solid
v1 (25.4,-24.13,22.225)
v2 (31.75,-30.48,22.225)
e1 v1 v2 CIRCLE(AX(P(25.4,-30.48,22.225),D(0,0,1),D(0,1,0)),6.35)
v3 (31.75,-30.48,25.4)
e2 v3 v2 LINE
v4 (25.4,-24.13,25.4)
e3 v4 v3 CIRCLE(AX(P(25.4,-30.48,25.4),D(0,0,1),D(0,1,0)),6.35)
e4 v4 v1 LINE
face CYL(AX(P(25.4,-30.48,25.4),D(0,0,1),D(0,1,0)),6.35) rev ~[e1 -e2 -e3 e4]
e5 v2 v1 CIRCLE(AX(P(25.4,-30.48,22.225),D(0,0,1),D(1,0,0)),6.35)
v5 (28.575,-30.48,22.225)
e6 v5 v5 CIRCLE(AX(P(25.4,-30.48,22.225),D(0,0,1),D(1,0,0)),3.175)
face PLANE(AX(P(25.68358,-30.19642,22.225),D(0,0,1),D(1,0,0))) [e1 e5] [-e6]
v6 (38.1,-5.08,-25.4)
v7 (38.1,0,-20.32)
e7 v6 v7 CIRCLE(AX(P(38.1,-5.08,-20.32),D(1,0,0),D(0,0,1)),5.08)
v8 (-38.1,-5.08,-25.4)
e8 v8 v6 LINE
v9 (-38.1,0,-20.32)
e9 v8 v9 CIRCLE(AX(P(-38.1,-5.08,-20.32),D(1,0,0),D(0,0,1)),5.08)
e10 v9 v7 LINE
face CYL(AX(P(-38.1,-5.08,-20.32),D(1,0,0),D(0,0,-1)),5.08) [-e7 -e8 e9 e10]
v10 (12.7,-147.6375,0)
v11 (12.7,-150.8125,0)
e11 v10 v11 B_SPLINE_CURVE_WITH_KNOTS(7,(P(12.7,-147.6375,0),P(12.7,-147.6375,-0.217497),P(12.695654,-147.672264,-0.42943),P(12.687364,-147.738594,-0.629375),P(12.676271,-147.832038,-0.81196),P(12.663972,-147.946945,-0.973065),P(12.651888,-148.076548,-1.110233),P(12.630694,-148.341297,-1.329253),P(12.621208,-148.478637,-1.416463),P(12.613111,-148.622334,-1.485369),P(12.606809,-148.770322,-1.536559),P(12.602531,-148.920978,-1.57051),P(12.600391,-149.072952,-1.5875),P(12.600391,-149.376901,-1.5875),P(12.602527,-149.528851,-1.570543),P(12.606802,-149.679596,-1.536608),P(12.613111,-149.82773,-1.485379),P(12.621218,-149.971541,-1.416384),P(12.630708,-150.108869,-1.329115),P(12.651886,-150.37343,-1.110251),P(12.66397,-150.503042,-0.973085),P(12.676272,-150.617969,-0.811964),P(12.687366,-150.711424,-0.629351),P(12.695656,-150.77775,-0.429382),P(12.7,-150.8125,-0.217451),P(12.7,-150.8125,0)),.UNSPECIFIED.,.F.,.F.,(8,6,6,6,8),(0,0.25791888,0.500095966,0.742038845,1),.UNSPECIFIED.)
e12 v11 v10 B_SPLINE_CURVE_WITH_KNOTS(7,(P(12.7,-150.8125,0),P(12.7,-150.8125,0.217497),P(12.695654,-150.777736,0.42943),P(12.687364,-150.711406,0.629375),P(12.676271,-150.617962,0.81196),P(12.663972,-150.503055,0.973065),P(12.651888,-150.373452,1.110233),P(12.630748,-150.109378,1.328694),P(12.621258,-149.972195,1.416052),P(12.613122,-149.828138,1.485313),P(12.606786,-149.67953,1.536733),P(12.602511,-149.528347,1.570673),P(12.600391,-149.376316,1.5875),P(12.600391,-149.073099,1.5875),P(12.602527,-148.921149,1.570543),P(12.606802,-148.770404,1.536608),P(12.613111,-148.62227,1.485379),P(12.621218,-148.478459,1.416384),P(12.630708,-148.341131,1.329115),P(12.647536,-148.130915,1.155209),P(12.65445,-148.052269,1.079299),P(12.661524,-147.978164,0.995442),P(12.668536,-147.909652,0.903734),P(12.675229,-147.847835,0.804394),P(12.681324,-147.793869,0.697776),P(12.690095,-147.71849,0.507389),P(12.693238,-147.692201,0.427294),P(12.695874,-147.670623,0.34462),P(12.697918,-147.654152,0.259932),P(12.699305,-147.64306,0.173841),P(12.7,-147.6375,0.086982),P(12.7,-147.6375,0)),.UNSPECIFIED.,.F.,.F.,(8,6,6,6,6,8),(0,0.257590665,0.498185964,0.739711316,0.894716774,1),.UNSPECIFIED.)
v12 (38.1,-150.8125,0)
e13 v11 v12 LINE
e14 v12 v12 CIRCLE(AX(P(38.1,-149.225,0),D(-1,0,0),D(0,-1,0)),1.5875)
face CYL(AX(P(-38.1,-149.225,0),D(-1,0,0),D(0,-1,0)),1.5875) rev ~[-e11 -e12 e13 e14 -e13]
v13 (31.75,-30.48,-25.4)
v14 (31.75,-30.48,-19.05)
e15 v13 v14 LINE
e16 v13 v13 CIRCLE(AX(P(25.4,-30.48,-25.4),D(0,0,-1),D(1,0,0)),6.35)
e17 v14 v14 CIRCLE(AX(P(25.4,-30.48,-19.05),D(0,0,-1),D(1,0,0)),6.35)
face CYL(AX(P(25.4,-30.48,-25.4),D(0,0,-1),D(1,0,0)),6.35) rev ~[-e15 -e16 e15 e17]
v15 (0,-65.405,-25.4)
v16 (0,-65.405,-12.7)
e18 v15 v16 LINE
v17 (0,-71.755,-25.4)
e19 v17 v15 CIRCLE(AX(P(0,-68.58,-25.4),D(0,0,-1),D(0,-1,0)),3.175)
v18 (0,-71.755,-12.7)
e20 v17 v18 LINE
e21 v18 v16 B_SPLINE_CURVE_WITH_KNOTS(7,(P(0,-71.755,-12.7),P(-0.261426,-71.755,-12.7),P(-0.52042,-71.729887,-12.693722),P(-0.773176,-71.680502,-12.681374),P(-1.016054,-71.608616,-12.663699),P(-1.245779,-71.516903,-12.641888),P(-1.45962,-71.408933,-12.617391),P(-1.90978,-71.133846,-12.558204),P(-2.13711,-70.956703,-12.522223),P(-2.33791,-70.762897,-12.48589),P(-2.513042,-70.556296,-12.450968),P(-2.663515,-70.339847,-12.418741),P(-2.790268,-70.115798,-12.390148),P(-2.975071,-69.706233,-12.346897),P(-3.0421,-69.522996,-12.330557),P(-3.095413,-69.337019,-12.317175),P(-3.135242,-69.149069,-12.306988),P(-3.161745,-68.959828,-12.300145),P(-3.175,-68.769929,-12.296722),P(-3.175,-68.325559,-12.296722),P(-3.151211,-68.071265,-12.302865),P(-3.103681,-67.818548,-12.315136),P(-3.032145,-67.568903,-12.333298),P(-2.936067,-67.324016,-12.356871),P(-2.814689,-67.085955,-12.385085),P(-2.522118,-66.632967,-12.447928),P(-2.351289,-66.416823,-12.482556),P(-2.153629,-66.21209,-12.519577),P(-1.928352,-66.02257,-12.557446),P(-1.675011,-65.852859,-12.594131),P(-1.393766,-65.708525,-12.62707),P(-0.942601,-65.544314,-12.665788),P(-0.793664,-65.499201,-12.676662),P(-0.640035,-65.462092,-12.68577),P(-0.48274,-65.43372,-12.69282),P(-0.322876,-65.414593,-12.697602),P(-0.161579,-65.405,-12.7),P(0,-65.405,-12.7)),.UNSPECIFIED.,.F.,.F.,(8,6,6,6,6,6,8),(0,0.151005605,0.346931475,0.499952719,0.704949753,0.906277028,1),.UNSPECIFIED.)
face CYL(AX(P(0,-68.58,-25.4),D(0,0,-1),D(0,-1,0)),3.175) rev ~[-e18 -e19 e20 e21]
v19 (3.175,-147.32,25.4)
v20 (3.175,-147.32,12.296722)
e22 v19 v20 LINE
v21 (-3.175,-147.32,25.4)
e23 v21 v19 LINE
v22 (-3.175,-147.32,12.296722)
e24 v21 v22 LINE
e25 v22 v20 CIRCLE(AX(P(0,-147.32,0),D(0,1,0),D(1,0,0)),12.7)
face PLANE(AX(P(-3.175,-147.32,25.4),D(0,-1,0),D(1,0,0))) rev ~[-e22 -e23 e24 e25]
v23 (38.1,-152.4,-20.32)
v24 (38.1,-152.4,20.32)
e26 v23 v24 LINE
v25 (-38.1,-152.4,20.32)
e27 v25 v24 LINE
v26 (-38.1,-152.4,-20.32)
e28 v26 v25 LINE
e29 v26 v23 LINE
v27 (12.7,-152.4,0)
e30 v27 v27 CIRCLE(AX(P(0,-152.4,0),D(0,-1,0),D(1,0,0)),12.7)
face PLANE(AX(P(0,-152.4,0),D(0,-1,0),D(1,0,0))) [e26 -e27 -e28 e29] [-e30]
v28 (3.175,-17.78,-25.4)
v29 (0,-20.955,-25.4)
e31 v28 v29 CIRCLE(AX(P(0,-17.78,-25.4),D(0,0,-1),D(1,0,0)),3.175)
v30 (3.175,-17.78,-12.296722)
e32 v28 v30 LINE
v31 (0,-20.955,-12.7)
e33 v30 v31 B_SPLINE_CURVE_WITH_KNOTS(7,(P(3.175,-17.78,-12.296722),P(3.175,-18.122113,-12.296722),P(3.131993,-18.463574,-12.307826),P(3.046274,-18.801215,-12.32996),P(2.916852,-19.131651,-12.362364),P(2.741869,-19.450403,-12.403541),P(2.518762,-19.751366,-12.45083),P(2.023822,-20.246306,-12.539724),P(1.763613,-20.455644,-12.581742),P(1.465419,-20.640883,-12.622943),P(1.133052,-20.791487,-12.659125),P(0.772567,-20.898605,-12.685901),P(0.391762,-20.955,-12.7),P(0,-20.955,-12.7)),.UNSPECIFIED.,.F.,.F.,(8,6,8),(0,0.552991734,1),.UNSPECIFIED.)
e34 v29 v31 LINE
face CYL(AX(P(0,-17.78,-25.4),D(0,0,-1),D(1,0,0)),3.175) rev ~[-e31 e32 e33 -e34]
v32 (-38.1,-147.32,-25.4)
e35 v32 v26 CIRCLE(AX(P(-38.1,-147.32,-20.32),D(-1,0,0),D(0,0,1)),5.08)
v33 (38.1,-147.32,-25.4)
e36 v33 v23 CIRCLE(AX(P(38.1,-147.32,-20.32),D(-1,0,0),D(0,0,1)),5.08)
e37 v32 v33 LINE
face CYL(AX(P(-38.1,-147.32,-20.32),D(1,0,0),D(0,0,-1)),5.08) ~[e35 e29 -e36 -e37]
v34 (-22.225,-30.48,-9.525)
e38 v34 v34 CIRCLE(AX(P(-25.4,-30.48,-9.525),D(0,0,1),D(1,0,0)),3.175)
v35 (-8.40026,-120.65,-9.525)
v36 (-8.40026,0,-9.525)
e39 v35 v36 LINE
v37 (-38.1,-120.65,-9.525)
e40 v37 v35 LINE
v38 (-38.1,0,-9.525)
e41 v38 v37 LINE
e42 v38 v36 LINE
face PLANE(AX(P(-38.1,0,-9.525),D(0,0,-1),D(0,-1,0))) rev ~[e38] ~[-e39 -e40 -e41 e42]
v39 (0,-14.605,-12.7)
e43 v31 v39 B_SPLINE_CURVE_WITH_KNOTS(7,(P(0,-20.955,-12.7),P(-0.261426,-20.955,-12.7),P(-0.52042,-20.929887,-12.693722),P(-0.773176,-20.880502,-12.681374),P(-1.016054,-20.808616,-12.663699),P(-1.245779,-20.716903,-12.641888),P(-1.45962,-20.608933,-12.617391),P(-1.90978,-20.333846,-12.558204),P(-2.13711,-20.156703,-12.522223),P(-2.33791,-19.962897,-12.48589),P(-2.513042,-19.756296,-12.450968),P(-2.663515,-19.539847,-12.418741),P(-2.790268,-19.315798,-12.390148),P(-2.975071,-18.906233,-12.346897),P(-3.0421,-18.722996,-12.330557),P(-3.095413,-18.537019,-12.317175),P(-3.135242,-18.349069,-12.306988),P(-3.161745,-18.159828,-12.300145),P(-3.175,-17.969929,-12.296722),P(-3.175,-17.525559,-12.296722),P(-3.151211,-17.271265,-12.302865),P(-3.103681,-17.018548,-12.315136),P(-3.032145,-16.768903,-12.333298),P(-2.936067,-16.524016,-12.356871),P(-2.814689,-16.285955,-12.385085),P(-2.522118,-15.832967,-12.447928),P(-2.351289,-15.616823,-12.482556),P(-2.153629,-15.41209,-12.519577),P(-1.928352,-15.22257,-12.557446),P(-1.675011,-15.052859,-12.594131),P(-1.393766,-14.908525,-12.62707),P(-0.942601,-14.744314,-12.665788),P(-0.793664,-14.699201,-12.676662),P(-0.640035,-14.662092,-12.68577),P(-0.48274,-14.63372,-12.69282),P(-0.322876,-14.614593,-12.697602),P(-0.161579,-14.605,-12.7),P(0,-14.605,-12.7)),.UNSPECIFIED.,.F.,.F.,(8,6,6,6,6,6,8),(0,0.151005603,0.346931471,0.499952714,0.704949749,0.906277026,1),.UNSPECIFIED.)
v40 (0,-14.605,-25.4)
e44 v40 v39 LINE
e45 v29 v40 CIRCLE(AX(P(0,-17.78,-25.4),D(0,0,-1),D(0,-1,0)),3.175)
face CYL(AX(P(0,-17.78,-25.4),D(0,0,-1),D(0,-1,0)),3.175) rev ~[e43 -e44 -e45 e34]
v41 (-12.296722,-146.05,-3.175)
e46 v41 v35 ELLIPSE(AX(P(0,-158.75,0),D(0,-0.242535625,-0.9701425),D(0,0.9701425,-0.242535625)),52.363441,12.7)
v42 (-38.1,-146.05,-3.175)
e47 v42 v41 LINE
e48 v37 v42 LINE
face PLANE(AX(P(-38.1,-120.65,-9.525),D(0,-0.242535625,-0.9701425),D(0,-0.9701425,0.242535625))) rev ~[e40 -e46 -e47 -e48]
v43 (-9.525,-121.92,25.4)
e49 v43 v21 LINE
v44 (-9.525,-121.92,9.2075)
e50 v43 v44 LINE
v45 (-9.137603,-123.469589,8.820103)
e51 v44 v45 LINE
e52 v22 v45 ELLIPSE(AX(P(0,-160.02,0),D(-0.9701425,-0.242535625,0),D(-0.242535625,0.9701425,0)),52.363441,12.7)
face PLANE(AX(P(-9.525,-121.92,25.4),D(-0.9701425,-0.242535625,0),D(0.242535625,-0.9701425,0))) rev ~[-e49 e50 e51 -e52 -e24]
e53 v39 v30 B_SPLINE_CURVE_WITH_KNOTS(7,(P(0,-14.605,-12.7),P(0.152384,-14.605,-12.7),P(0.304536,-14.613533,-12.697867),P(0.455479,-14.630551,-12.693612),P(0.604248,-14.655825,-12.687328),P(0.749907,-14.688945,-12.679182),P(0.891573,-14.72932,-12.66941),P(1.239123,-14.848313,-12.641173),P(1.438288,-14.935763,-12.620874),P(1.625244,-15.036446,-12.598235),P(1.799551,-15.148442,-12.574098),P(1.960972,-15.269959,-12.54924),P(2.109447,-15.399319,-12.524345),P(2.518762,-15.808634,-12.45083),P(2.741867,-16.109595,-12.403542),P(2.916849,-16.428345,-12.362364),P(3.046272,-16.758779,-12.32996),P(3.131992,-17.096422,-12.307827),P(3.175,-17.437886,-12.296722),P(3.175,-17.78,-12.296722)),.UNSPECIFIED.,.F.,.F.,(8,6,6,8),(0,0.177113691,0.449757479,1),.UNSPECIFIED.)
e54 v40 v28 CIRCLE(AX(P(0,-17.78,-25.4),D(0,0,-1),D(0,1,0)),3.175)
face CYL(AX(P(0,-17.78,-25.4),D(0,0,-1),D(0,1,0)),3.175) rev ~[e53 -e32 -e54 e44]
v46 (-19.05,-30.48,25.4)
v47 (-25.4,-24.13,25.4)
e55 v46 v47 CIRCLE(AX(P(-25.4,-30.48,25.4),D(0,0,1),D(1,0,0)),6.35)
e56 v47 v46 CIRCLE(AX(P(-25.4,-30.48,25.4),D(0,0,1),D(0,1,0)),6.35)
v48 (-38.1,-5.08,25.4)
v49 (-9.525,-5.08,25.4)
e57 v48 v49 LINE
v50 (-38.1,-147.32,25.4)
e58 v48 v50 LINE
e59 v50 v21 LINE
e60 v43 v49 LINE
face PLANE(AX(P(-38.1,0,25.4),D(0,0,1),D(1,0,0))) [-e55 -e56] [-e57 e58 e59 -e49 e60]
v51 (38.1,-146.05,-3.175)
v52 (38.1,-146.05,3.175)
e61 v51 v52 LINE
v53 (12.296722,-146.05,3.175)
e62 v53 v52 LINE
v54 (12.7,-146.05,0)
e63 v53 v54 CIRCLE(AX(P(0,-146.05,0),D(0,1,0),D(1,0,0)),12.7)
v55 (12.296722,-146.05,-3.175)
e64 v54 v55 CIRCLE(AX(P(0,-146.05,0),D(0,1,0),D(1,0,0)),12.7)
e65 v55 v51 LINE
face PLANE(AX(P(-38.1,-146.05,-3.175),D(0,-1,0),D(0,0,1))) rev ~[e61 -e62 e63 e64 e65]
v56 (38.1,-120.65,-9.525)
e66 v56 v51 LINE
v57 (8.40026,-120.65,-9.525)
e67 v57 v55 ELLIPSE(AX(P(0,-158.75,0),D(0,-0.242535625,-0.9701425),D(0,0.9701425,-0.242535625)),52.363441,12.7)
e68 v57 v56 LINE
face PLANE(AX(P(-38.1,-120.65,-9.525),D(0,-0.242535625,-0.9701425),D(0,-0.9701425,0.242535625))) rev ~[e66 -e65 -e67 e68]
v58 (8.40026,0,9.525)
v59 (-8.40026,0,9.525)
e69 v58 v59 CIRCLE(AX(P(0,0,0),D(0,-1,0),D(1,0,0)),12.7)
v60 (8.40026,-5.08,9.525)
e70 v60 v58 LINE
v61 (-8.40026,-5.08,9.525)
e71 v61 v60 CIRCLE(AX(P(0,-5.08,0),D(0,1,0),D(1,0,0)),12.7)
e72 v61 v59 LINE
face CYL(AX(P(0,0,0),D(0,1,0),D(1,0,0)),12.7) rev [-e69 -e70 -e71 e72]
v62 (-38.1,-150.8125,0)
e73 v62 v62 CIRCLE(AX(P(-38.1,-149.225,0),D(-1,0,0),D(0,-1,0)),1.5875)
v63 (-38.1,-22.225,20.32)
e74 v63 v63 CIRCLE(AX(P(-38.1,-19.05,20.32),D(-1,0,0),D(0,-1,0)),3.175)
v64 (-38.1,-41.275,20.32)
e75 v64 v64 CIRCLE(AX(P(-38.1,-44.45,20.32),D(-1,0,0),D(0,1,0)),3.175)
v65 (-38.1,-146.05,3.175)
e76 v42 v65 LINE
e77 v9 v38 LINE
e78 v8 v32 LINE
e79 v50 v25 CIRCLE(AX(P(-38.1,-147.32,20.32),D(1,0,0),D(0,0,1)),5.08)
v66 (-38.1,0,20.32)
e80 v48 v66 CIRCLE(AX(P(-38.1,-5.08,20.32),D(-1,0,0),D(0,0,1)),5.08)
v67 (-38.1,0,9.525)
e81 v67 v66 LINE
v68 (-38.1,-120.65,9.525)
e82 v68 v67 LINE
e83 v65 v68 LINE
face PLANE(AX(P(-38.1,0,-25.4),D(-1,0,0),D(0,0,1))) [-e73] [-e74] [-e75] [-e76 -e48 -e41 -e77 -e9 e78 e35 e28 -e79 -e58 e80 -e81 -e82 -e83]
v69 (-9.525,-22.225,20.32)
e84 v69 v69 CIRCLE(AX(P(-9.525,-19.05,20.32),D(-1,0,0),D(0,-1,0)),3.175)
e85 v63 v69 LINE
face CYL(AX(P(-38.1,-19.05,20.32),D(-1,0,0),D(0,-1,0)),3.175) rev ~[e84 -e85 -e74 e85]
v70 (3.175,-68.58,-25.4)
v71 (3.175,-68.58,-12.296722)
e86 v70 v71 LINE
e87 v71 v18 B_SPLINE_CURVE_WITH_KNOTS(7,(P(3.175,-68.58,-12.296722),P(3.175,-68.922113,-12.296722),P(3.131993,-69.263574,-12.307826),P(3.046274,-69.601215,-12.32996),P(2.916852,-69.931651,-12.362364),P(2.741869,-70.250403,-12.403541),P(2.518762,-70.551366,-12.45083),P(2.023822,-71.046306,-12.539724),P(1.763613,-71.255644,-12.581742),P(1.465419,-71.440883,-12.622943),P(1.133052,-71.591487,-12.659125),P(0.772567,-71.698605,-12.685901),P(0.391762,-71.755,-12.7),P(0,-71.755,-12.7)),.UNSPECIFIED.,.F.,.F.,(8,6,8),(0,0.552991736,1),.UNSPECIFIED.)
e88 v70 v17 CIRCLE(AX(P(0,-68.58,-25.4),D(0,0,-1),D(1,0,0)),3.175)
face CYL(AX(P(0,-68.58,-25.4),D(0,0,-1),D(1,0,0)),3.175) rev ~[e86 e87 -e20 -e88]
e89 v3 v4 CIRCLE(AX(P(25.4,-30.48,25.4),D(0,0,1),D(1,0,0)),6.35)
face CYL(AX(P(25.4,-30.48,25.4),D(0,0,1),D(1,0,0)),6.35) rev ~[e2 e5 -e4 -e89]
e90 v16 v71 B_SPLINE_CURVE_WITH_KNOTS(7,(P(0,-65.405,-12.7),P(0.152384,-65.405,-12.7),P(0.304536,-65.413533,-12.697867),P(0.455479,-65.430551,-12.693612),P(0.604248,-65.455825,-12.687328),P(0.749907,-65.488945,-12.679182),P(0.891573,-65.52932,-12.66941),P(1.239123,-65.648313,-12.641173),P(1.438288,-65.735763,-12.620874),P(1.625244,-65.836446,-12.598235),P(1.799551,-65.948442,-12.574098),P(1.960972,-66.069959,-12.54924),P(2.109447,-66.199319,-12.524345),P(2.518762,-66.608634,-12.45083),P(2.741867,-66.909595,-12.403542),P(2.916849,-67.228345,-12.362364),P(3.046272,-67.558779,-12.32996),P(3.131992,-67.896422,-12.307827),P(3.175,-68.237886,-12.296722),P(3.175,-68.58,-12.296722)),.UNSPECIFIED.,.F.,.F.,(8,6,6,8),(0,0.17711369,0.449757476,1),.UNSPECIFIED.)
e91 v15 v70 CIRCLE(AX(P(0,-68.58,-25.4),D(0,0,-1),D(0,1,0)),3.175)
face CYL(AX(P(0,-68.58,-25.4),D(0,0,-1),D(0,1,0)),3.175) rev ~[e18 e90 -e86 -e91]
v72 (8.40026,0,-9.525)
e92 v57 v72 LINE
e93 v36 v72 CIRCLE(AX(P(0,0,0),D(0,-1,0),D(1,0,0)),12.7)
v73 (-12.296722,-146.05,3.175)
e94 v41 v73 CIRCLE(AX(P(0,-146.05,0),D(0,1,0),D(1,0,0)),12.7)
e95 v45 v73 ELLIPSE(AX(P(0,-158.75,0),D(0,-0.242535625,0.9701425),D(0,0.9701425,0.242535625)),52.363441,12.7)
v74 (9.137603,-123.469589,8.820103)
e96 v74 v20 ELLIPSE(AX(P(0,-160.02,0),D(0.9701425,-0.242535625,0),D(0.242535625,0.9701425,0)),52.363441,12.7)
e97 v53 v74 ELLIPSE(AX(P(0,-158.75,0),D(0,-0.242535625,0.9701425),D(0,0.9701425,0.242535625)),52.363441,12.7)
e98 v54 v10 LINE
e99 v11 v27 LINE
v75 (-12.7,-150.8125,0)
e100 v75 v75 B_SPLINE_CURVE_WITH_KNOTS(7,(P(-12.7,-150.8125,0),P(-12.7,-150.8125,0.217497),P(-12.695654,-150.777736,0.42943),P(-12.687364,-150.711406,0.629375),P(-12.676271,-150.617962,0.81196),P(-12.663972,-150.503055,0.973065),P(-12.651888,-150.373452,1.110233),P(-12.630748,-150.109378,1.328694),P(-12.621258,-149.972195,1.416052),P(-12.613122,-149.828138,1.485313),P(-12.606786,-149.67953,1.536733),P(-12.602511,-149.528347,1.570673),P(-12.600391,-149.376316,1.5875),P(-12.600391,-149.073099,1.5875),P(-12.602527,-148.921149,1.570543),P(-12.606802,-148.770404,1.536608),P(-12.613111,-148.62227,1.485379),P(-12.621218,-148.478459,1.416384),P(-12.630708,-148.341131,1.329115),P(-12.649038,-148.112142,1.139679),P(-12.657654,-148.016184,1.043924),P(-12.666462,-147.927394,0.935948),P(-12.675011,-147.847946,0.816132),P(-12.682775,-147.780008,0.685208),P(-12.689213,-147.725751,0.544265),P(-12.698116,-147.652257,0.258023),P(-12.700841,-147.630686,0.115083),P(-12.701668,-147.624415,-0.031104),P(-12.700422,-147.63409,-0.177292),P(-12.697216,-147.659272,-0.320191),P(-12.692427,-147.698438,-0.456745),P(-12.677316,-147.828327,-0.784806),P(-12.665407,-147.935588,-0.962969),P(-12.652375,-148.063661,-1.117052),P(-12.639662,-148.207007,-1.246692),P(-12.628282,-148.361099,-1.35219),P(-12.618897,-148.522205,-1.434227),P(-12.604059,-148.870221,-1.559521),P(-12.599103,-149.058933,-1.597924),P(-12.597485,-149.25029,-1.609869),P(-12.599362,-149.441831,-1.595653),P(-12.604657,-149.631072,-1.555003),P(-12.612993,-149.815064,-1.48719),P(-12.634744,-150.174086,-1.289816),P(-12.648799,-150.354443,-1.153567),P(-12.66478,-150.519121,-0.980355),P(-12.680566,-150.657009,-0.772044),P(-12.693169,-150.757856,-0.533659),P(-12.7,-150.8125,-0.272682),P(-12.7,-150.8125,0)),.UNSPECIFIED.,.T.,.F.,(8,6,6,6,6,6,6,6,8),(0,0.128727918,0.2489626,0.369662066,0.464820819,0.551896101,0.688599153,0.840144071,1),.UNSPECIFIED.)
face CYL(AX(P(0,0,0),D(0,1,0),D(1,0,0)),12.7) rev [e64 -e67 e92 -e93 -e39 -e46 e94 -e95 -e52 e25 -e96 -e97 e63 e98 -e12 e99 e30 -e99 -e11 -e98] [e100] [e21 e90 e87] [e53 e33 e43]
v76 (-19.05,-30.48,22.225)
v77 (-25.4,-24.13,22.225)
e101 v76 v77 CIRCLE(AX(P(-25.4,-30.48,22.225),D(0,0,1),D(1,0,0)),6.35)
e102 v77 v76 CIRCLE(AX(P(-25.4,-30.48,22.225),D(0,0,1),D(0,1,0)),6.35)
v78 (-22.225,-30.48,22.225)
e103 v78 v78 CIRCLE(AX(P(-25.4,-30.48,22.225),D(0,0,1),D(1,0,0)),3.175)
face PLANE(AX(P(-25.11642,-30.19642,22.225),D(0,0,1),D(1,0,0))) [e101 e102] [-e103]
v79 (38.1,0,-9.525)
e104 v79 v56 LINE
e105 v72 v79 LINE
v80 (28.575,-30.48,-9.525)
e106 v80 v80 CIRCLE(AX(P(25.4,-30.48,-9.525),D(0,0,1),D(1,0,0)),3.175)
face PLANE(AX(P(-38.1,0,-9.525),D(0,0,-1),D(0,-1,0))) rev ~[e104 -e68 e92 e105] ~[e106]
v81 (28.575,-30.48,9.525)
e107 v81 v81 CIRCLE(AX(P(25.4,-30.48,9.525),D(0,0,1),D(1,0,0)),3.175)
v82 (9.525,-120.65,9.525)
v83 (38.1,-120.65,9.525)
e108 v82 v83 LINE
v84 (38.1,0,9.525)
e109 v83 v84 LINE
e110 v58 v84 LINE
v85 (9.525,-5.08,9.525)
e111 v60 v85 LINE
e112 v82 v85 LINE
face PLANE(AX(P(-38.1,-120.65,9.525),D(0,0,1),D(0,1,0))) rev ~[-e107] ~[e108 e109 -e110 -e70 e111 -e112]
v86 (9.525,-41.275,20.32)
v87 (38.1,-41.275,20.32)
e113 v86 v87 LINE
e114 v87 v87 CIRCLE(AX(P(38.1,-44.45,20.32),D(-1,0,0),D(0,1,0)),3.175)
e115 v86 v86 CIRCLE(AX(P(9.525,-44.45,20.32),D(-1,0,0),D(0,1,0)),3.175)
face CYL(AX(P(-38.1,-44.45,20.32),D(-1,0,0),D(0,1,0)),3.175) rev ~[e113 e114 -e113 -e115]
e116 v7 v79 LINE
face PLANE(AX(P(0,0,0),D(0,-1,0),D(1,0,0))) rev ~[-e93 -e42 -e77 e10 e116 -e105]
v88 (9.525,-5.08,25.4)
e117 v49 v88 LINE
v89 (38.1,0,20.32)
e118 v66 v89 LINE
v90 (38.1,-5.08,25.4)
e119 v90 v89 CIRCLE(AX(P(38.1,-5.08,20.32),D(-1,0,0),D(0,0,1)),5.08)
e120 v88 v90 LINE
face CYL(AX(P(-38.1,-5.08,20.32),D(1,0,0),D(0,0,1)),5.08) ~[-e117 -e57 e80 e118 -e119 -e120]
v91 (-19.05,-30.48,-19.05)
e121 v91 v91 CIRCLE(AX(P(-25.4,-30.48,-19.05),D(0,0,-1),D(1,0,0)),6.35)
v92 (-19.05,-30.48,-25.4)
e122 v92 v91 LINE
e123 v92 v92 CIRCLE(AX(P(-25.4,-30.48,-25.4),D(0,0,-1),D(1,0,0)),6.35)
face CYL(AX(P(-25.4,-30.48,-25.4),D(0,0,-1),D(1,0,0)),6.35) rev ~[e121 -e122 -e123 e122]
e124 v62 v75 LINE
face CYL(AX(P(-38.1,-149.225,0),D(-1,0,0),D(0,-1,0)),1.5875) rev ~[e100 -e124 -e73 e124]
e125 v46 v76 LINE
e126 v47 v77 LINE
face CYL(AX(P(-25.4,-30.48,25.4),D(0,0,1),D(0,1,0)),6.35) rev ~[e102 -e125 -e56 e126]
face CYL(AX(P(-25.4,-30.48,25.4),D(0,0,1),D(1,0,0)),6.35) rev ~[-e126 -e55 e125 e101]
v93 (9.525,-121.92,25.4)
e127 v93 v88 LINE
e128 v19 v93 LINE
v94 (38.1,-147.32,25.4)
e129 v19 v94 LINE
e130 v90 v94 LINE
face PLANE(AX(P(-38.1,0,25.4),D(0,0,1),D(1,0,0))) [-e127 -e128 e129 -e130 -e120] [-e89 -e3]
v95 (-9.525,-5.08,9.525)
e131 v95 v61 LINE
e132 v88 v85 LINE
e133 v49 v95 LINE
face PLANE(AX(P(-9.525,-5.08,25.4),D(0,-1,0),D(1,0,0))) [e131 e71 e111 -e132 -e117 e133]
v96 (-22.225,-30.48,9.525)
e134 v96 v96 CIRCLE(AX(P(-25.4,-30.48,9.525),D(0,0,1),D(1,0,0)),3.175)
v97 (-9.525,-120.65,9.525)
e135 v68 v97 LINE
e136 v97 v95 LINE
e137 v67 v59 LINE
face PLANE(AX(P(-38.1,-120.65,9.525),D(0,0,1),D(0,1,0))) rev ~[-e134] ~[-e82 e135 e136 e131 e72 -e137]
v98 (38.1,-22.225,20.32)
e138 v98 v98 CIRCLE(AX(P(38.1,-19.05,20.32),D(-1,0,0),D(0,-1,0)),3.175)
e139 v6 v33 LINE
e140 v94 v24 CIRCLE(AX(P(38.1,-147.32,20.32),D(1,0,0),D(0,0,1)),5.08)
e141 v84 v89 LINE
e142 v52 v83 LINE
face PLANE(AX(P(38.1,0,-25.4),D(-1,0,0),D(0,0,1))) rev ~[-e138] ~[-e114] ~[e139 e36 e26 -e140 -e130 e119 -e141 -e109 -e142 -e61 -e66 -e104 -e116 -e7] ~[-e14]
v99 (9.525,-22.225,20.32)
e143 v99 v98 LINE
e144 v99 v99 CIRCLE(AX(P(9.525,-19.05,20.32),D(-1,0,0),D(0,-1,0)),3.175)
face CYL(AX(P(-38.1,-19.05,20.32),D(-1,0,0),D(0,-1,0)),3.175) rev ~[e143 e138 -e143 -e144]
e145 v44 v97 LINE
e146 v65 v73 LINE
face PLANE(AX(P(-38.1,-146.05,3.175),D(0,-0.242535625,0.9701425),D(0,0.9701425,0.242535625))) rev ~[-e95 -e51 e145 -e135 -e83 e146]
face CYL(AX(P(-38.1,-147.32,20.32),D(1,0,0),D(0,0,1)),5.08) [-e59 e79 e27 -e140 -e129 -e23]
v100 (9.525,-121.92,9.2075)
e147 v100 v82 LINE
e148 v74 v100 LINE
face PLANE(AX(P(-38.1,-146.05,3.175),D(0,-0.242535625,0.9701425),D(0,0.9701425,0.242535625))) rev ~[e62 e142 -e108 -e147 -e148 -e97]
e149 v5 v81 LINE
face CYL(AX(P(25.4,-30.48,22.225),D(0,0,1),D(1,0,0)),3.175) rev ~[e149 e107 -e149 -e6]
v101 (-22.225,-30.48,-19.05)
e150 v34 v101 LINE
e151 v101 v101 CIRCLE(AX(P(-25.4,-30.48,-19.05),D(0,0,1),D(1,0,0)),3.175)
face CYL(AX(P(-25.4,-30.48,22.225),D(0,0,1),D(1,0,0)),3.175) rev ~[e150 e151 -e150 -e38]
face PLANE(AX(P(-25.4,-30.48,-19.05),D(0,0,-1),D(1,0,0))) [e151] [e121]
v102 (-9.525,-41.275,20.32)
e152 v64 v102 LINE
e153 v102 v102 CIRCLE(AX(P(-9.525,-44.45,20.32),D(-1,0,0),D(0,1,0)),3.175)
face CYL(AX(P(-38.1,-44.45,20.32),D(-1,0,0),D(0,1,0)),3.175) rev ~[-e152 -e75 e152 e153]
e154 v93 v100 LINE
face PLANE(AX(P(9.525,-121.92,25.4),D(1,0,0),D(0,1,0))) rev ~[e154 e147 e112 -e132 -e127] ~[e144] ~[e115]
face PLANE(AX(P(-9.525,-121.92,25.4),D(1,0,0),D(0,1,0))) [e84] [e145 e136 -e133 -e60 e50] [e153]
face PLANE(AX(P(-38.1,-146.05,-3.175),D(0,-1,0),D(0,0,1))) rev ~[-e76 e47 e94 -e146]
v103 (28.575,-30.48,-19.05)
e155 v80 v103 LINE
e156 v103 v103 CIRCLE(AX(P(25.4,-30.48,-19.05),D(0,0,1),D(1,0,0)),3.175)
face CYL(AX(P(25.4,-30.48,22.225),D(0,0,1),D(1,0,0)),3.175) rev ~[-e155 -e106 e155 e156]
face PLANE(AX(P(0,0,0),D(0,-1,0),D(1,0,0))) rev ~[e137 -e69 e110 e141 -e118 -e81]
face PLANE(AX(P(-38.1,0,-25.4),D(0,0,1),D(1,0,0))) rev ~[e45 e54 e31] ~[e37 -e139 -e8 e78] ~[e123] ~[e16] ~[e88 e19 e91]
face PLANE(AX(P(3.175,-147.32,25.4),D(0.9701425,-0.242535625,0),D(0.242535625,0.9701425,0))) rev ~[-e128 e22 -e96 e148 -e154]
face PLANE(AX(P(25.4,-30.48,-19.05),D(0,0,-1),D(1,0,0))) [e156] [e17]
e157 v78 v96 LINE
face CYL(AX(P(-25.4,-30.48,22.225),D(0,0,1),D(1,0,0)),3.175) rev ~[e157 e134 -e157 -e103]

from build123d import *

# Parameters (mm, degrees)
F0_W      = 76.2
F0_H      = 50.8
F0_R      = 12.7
F1_DEPTH  = 152.4
F2_R      = 5.08
F4_DEPTH  = 76.201
F5_W      = 19.05
F5_H      = 116.84
F6_DEPTH  = 19.05
F8_DEPTH  = 50.801
F10_DEPTH = 76.201
F12_DEPTH = 3.175
F13_R     = 3.175
F14_DEPTH = 47.6260001
F15_R     = 3.175
F16_DEPTH = 47.6260001
F17_R     = 6.35
F18_DEPTH = 6.35
F19_R     = 3.175
F20_DEPTH = 76.2010001


with BuildPart() as f1:
    # F0 (on Front) → F1 (new body)
    with BuildSketch(Plane.XZ):
        Rectangle(F0_W, F0_H)
        Circle(F0_R, mode=Mode.SUBTRACT)
    extrude(amount=F1_DEPTH)

    # F2
    f2_edges = [f1.edges().sort_by_distance(p)[0] for p in [
        (0, -152.4, 25.4),
        (0, -152.4, -25.4),
        (0, 0, 25.4),
        (0, 0, -25.4),
    ]]
    fillet(f2_edges, radius=F2_R)

    # F3 (on face) → F4 (cut, through all)
    with BuildSketch(Plane(origin=(-38.1, 0, 0), x_dir=(0, -1, 0), z_dir=(-1, 0, 0))):
        Polygon((12.7, 0), (0, 0), (0, -3.175), (0, -9.525), (120.65, -9.525), (120.65, 0), (88.9, 0), align=None)
        Polygon((0, 3.175), (0, 0), (12.7, 0), (88.9, 0), (120.65, 0), (120.65, 9.525), (0, 9.525), align=None)
        Polygon((120.65, 9.525), (120.65, 0), (139.7, 0), (146.05, 0), (146.05, 3.175), align=None)
        Polygon((139.7, 0), (120.65, 0), (120.65, -9.525), (146.05, -3.175), (146.05, 0), align=None)
    extrude(amount=-F4_DEPTH, mode=Mode.SUBTRACT)

    # F5 (on face) → F6 (cut)
    with BuildSketch(Plane.XY.offset(25.4)):
        Polygon((-3.175, -147.32), (0, -147.32), (3.175, -147.32), (9.525, -121.92), (-9.525, -121.92), align=None)
        with Locations((0, -63.5)):
            Rectangle(F5_W, F5_H)
    extrude(amount=-F6_DEPTH, mode=Mode.SUBTRACT)

    # F7 (on face) → F8 (cut, through all)
    with BuildSketch(Plane(origin=(0, 0, -25.4), x_dir=(1, 0, 0), z_dir=(0, 0, -1))):
        with BuildLine():
            ThreePointArc((0, 20.955), (-3.175, 17.78), (0, 14.605))
            Line((0, 14.605), (0, 17.78))
            Line((0, 17.78), (0, 20.955))
        make_face()
        with BuildLine():
            ThreePointArc((0, 71.755), (-3.175, 68.58), (0, 65.405))
            Line((0, 65.405), (0, 68.58))
            Line((0, 68.58), (0, 71.755))
        make_face()
        with BuildLine():
            Line((0, 68.58), (0, 65.405))
            ThreePointArc((0, 65.405), (2.2450640303, 66.3349359697), (3.175, 68.58))
            ThreePointArc((3.175, 68.58), (2.2450640303, 70.8250640303), (0, 71.755))
            Line((0, 71.755), (0, 68.58))
        make_face()
        with BuildLine():
            Line((0, 17.78), (0, 14.605))
            ThreePointArc((0, 14.605), (2.2450640303, 15.5349359697), (3.175, 17.78))
            ThreePointArc((3.175, 17.78), (2.2450640303, 20.0250640303), (0, 20.955))
            Line((0, 20.955), (0, 17.78))
        make_face()
    extrude(amount=-F8_DEPTH, mode=Mode.SUBTRACT)

    # F9 (on face) → F10 (cut, through all)
    with BuildSketch(Plane(origin=(-38.1, 0, 0), x_dir=(0, -1, 0), z_dir=(-1, 0, 0))):
        with BuildLine():
            ThreePointArc((147.6375, 0), (149.225, -1.5875), (150.8125, 0))
            Line((150.8125, 0), (149.225, 0))
            Line((149.225, 0), (147.6375, 0))
        make_face()
        with BuildLine():
            Line((149.225, 0), (150.8125, 0))
            ThreePointArc((150.8125, 0), (149.225, 1.5875), (147.6375, 0))
            Line((147.6375, 0), (149.225, 0))
        make_face()
    extrude(amount=-F10_DEPTH, mode=Mode.SUBTRACT)

    # F11 (on face) → F12 (cut)
    with BuildSketch(Plane.XY.offset(25.4)):
        with BuildLine():
            ThreePointArc((-19.05, -30.48), (-20.9098719395, -25.9898719395), (-25.4, -24.13))
            ThreePointArc((-25.4, -24.13), (-29.8901280605, -34.9701280605), (-19.05, -30.48))
        make_face()
        with BuildLine():
            ThreePointArc((31.75, -30.48), (29.8901280605, -25.9898719395), (25.4, -24.13))
            ThreePointArc((25.4, -24.13), (20.9098719395, -34.9701280605), (31.75, -30.48))
        make_face()
    extrude(amount=-F12_DEPTH, mode=Mode.SUBTRACT)

    # F13 (on face) → F14 (cut, through all)
    with BuildSketch(Plane.XY.offset(22.225)):
        with Locations((25.4, -30.48)):
            Circle(F13_R)
    extrude(amount=-F14_DEPTH, mode=Mode.SUBTRACT)

    # F15 (on face) → F16 (cut, through all)
    with BuildSketch(Plane.XY.offset(22.225)):
        with Locations((-25.4, -30.48)):
            Circle(F15_R)
    extrude(amount=-F16_DEPTH, mode=Mode.SUBTRACT)

    # F17 (on face) → F18 (cut)
    with BuildSketch(Plane(origin=(0, 0, -25.4), x_dir=(1, 0, 0), z_dir=(0, 0, -1))):
        with Locations((-25.4, 30.48)):
            Circle(F17_R)
        with Locations((25.4, 30.48)):
            Circle(F17_R)
    extrude(amount=-F18_DEPTH, mode=Mode.SUBTRACT)

    # F19 (on face) → F20 (cut, through all)
    with BuildSketch(Plane(origin=(-38.1, 0, 0), x_dir=(0, -1, 0), z_dir=(-1, 0, 0))):
        with BuildLine():
            ThreePointArc((47.625, 20.32), (44.45, 23.495), (41.275, 20.32))
            ThreePointArc((41.275, 20.32), (44.45, 17.145), (47.625, 20.32))
        make_face()
        with Locations((19.05, 20.32)):
            Circle(F19_R)
    extrude(amount=-F20_DEPTH, mode=Mode.SUBTRACT)


solid = f1.part
